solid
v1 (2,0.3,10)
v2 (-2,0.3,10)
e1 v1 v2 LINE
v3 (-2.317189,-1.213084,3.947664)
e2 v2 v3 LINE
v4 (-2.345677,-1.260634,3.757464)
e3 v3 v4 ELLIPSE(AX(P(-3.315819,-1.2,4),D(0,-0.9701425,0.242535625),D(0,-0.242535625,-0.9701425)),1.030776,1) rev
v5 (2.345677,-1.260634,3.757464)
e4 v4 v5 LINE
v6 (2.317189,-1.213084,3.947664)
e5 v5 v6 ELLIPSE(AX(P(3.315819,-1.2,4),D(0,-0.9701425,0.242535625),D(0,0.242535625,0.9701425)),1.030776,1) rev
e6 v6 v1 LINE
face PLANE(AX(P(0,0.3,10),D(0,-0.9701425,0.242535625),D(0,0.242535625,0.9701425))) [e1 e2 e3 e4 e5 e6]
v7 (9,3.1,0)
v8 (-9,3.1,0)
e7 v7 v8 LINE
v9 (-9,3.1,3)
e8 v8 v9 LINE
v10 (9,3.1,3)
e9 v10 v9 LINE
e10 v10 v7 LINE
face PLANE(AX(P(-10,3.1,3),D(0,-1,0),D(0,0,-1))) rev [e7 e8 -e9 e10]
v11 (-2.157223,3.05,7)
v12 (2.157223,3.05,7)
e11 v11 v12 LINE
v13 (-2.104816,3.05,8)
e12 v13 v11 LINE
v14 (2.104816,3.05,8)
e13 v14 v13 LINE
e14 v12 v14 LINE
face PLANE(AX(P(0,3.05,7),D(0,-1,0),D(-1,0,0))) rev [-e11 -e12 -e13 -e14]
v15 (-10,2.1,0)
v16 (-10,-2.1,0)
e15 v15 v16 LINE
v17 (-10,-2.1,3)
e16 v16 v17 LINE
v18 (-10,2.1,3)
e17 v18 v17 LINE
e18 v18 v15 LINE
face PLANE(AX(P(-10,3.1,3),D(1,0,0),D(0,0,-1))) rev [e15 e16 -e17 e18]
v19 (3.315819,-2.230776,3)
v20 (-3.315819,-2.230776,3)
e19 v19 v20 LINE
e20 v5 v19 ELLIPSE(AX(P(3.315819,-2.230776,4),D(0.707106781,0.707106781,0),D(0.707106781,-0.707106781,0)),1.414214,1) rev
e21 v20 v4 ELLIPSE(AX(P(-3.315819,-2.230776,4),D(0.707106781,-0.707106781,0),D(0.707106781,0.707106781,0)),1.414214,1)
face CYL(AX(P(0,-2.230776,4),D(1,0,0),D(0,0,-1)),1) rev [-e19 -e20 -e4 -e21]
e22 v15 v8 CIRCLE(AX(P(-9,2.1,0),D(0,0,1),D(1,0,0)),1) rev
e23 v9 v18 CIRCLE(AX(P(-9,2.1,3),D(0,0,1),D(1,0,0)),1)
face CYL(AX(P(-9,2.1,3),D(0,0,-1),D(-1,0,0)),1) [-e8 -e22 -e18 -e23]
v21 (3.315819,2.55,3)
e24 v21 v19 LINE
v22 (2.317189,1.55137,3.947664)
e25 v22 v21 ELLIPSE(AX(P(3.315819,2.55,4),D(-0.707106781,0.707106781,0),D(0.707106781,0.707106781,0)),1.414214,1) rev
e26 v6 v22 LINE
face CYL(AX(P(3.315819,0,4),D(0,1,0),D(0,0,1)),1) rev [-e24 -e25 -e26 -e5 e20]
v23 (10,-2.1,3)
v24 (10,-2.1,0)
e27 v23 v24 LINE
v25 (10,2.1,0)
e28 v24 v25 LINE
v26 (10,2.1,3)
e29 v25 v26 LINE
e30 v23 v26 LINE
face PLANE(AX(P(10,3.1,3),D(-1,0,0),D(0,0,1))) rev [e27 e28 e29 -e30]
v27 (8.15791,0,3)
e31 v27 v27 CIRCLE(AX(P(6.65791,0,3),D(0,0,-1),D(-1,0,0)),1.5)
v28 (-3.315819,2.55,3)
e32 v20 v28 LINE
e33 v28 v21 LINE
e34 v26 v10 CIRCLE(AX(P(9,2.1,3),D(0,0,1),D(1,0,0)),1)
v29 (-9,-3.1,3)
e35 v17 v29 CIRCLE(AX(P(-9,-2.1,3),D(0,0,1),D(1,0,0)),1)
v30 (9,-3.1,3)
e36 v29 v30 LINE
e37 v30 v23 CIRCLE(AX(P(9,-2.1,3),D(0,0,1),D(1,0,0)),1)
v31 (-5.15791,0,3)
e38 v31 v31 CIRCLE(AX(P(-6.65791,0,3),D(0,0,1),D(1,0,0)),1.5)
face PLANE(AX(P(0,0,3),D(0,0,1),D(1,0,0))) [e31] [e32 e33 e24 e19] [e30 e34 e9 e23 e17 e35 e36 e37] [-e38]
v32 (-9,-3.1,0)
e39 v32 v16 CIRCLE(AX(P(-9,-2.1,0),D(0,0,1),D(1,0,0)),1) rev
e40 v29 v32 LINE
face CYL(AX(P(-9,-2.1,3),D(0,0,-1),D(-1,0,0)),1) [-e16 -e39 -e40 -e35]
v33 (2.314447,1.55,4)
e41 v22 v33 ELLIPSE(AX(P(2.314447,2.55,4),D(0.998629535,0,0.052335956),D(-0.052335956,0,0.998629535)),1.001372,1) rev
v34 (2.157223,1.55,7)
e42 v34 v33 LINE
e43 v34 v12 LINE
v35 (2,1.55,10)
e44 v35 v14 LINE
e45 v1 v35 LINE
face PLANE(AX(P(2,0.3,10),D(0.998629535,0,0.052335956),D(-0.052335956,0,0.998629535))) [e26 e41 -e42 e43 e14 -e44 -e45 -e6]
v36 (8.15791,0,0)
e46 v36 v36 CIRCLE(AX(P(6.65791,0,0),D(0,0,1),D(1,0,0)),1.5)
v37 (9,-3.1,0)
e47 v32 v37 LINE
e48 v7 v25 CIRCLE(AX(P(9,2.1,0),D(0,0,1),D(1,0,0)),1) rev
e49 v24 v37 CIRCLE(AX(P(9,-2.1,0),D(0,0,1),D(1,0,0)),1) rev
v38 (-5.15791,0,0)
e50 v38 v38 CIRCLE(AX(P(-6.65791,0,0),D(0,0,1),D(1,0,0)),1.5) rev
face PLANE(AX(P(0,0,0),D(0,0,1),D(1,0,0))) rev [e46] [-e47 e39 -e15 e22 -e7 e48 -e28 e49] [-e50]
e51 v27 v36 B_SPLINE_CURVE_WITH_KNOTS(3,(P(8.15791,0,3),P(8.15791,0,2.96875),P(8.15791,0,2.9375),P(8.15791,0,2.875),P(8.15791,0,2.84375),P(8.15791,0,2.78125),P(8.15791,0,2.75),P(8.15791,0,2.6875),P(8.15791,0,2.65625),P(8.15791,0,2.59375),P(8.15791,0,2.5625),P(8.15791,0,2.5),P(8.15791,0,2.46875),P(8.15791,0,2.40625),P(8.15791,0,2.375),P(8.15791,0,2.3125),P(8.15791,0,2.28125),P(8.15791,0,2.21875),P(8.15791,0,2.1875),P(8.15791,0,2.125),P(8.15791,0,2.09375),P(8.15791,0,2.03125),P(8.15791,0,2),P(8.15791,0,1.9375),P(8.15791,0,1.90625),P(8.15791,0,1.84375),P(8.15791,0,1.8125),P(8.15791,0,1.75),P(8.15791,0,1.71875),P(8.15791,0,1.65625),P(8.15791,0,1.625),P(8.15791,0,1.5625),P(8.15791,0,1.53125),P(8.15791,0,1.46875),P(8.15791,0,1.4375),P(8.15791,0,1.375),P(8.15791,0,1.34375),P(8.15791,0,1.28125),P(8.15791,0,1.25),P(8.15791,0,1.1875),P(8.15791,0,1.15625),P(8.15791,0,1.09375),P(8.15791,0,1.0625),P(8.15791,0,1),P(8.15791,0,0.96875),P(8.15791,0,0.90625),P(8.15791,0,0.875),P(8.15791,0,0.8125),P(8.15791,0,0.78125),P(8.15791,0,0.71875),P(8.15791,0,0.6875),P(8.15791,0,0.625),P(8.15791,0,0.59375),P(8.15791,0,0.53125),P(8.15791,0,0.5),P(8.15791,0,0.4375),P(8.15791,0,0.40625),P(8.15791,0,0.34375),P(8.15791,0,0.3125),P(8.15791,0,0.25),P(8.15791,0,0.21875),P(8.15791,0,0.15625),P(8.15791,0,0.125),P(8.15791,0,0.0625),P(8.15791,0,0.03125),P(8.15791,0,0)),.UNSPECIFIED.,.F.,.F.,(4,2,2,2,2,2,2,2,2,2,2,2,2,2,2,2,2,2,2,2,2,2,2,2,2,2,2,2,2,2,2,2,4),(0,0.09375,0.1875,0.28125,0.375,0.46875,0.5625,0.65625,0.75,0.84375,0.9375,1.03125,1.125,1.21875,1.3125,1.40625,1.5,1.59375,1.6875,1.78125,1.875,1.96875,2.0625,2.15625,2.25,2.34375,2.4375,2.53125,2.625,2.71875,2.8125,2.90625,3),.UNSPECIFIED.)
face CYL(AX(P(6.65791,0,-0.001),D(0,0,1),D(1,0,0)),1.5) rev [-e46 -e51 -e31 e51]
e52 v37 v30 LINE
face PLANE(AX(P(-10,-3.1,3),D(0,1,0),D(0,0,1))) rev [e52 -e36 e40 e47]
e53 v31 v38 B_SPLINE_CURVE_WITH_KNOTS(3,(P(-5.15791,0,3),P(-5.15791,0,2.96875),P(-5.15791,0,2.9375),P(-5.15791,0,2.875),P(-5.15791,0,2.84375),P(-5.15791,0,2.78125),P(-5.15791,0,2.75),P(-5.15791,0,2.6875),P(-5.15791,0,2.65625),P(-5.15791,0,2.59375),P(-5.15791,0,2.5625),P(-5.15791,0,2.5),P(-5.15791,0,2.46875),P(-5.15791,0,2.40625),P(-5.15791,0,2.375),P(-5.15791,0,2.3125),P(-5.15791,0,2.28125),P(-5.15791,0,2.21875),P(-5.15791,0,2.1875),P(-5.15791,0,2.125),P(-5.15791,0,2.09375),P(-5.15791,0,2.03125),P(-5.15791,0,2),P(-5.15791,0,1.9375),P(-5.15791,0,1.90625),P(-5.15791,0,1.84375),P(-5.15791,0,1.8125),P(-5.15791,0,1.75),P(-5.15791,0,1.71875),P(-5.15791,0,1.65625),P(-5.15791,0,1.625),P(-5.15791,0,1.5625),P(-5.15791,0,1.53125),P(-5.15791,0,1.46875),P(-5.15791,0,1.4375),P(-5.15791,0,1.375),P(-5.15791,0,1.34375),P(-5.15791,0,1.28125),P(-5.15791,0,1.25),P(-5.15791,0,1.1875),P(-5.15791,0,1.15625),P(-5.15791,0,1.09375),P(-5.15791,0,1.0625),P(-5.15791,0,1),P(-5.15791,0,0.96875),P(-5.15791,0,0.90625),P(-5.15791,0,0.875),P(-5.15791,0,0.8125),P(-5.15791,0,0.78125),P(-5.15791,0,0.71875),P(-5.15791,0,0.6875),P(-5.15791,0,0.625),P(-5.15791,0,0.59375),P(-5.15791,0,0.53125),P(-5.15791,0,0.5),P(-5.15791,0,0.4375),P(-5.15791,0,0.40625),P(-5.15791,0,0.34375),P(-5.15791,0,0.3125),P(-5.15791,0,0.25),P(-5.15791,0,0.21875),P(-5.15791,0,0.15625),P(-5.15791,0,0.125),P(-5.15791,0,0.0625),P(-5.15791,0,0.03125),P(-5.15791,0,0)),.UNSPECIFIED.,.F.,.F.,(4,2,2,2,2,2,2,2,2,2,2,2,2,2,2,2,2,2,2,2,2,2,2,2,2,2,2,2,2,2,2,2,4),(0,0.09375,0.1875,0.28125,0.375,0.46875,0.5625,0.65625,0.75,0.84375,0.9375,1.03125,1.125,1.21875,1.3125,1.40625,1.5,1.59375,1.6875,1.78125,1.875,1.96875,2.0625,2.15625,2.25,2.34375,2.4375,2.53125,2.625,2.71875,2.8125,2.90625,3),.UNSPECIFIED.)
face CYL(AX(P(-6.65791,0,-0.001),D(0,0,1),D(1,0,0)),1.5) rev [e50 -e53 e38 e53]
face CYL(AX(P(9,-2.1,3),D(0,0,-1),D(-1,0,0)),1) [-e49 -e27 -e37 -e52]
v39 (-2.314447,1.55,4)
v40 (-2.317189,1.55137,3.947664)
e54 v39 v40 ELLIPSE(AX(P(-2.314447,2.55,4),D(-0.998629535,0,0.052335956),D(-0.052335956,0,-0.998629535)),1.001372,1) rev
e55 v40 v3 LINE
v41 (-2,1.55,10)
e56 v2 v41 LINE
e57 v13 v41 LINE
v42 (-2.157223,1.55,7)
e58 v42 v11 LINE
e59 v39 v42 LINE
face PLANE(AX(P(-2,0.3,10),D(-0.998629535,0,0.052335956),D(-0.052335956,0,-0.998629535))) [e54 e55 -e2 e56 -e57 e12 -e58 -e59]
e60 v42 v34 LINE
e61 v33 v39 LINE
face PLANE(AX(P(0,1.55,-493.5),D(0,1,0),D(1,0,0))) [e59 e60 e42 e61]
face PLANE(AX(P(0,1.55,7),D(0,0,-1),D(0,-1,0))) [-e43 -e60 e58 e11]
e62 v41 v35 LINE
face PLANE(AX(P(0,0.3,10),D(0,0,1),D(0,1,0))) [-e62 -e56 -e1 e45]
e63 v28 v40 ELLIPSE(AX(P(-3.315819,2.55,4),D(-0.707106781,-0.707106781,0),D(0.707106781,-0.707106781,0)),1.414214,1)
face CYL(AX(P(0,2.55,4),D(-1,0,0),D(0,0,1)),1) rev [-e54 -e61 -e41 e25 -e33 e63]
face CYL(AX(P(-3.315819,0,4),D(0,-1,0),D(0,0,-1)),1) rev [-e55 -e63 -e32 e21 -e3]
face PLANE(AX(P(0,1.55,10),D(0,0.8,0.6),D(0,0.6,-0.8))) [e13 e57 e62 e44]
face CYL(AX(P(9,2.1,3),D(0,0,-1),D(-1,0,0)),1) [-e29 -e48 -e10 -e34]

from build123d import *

# Parameters (mm, degrees)
SKETCH1_W           = 20
SKETCH1_H           = 6.2
BOSS_EXTRUDE1_DEPTH = 3
SNAP_START          = 0.3
SNAP_HOOK1_DEPTH    = 1.25
SNAP_START_2        = -2.157223338
SNAP_HOOK1_2_DEPTH  = 4.314446676
SNAP_START_3        = -2.366854455
SNAP_HOOK1_3_DEPTH  = 4.73370891
SNAP_START_4        = -2
SNAP_HOOK1_4_DEPTH  = 6
FILLET1_R           = 1
CUT_EXTRUDE1_REACH  = 14.594
SKETCH3_R           = 1.5
FILLET2_R           = 1


with BuildPart() as part:
    # Sketch1 → Boss-Extrude1 (new body)
    with BuildSketch(Plane.XY):
        Rectangle(SKETCH1_W, SKETCH1_H)
    extrude(amount=BOSS_EXTRUDE1_DEPTH)

    # Snap Hook1: read off the stored shape, not the designer's step
    # Snap Hook1 outline → Snap Hook1 (add)
    with BuildSketch(Plane(origin=(0, 0, 0), x_dir=(1, 0, 0), z_dir=(0, 1, 0)).offset(SNAP_START)):
        Polygon((2.366854455, -3), (-2.366854455, -3), (-2, -10), (2, -10), align=None)
    extrude(amount=SNAP_HOOK1_DEPTH)

    # Snap Hook1 2 outline → Snap Hook1 2 (add)
    with BuildSketch(Plane.YZ.offset(SNAP_START_2)):
        Polygon((0.3, 3), (0.3, 10), (-1.45, 3), align=None)
        Polygon((1.55, 10), (1.55, 7), (3.05, 7), (3.05, 8), align=None)
    extrude(amount=SNAP_HOOK1_2_DEPTH)

    # Snap Hook1 3 outline → Snap Hook1 3 (add)
    with BuildSketch(Plane.YZ.offset(SNAP_START_3)):
        Polygon((0.3, 3), (0.3, 10), (-1.45, 3), align=None)
    extrude(amount=SNAP_HOOK1_3_DEPTH)

    # Snap Hook1 4 outline → Snap Hook1 4 (cut)
    with BuildSketch(Plane(origin=(0, 0, 0), x_dir=(1, 0, 0), z_dir=(0, 1, 0)).offset(SNAP_START_4)):
        Polygon((-2.366854455, -3), (-2.366854455, -11), (-1.947592221, -11), (-2, -10), align=None)
        Polygon((2, -10), (1.947592221, -11), (2.366854455, -11), (2.366854455, -3), align=None)
    extrude(amount=SNAP_HOOK1_4_DEPTH, mode=Mode.SUBTRACT)

    # Fillet1
    # the kernel refuses this fillet: 1 mm, written as the material it adds along each edge
    with BuildSketch(Plane(origin=(4.866854455, 1.55, 3), x_dir=(0, 1, 0), z_dir=(-1, 0, 0))) as fillet1_piece_1_section:
        with BuildLine():
            CenterArc((FILLET1_R, -FILLET1_R), FILLET1_R, 90, 90)
            Line((0, -FILLET1_R), (0, 0))
            Line((0, 0), (FILLET1_R, 0))
        make_face()
    fillet1_piece_1 = extrude(amount=9.73370891, mode=Mode.PRIVATE)
    fillet1_piece_1 = split(fillet1_piece_1, bisect_by=Plane(origin=(-2.347040948, 1.55, 3.378064238), z_dir=(0.9986295347544344, 0, -0.05233595624560593)), keep=Keep.TOP, mode=Mode.PRIVATE)
    fillet1_piece_1 = split(fillet1_piece_1, bisect_by=Plane(origin=(2.373702086, 1.55, 2.869339421), z_dir=(-0.9986295347544344, 0, -0.05233595624560593)), keep=Keep.TOP, mode=Mode.PRIVATE)
    add(fillet1_piece_1)
    with BuildSketch(Plane(origin=(2.366854455, 1.55, 3), x_dir=(1, 0, 0), z_dir=(0, -1, 0))) as fillet1_piece_2_section:
        with BuildLine():
            CenterArc((FILLET1_R * 0.948964566712, FILLET1_R), FILLET1_R, 183, 87)
            Line((-FILLET1_R * 0.0496649680421, FILLET1_R * 0.947664043754), (0, 0))
            Line((0, 0), (FILLET1_R * 0.948964566712, 0))
        make_face()
    fillet1_piece_2 = extrude(amount=5.372411417, mode=Mode.PRIVATE)
    fillet1_piece_2 = split(fillet1_piece_2, bisect_by=Plane(origin=(2.366854455, -1.273529412, 3.705882353), z_dir=(0, 0.9701425001453319, -0.24253562503633297)), keep=Keep.TOP, mode=Mode.PRIVATE)
    add(fillet1_piece_2)
    with BuildSketch(Plane(origin=(4.318795471, -1.45, 3), x_dir=(0, -1, 0), z_dir=(-1, 0, 0))) as fillet1_piece_3_section:
        with BuildLine():
            CenterArc((FILLET1_R * 0.780776406404, FILLET1_R), FILLET1_R, 194.036243468, 75.963756532)
            Line((-FILLET1_R * 0.189366093741, FILLET1_R * 0.757464374964), (0, 0))
            Line((0, 0), (FILLET1_R * 0.780776406404, 0))
        make_face()
    fillet1_piece_3 = extrude(amount=8.637590942, mode=Mode.PRIVATE)
    fillet1_piece_3 = split(fillet1_piece_3, bisect_by=Plane(origin=(2.372200924, -1.45, 2.897983303), z_dir=(-0.9986295347544344, 0, -0.05233595624560593)), keep=Keep.TOP, mode=Mode.PRIVATE)
    fillet1_piece_3 = split(fillet1_piece_3, bisect_by=Plane(origin=(-2.34854211, -1.45, 3.349420356), z_dir=(0.9986295347544344, 0, -0.05233595624560593)), keep=Keep.TOP, mode=Mode.PRIVATE)
    add(fillet1_piece_3)
    with BuildSketch(Plane(origin=(-2.366854455, -3.822411417, 3), x_dir=(-1, 0, 0), z_dir=(0, 1, 0))) as fillet1_piece_4_section:
        with BuildLine():
            CenterArc((FILLET1_R * 0.948964566712, FILLET1_R), FILLET1_R, 183, 87)
            Line((-FILLET1_R * 0.0496649680421, FILLET1_R * 0.947664043754), (0, 0))
            Line((0, 0), (FILLET1_R * 0.948964566712, 0))
        make_face()
    fillet1_piece_4 = extrude(amount=5.372411417, mode=Mode.PRIVATE)
    fillet1_piece_4 = split(fillet1_piece_4, bisect_by=Plane(origin=(-2.366854455, -1.589553613, 2.441785549), z_dir=(0, 0.9701425001453319, -0.24253562503633297)), keep=Keep.TOP, mode=Mode.PRIVATE)
    add(fillet1_piece_4)
    with BuildSketch(Plane(origin=(2.366854455, 3.922411417, 3), x_dir=(1, 0, 0), z_dir=(0, -1, 0))) as fillet1_piece_5a_section:
        with BuildLine():
            CenterArc((FILLET1_R * 0.948964566712, FILLET1_R), FILLET1_R, 183, 87)
            Line((-FILLET1_R * 0.0496649680421, FILLET1_R * 0.947664043754), (0, 0))
            Line((0, 0), (FILLET1_R * 0.948964566712, 0))
        make_face()
    fillet1_piece_5a = extrude(amount=7.744822834, mode=Mode.PRIVATE)
    fillet1_piece_5a = split(fillet1_piece_5a, bisect_by=Plane(origin=(2.366854455, 3.1, 3), z_dir=(0, -1, 0)), keep=Keep.TOP, mode=Mode.PRIVATE)
    fillet1_piece_5a = split(fillet1_piece_5a, bisect_by=Plane(origin=(2.366854455, 1.55, 3), z_dir=(0, 1, 0)), keep=Keep.TOP, mode=Mode.PRIVATE)
    with BuildSketch(Plane(origin=(4.866854455, 1.55, 3), x_dir=(0, 1, 0), z_dir=(-1, 0, 0))) as fillet1_piece_5b_section:
        with BuildLine():
            CenterArc((FILLET1_R, -FILLET1_R), FILLET1_R, 90, 90)
            Line((0, -FILLET1_R), (0, 0))
            Line((0, 0), (FILLET1_R, 0))
        make_face()
    fillet1_piece_5b = extrude(amount=9.73370891, mode=Mode.PRIVATE)
    fillet1_piece_5b = split(fillet1_piece_5b, bisect_by=Plane(origin=(2.373702086, 1.55, 2.869339421), z_dir=(0.9986295347544344, 0, 0.05233595624560593)), keep=Keep.TOP, mode=Mode.PRIVATE)
    fillet1_piece_5 = fillet1_piece_5a & fillet1_piece_5b
    add(fillet1_piece_5)
    with BuildSketch(Plane(origin=(4.866854455, 1.55, 3), x_dir=(0, 1, 0), z_dir=(-1, 0, 0))) as fillet1_piece_6a_section:
        with BuildLine():
            CenterArc((FILLET1_R, -FILLET1_R), FILLET1_R, 90, 90)
            Line((0, -FILLET1_R), (0, 0))
            Line((0, 0), (FILLET1_R, 0))
        make_face()
    fillet1_piece_6a = extrude(amount=9.73370891, mode=Mode.PRIVATE)
    fillet1_piece_6a = split(fillet1_piece_6a, bisect_by=Plane(origin=(-2.347040948, 1.55, 3.378064238), z_dir=(-0.9986295347544344, 0, 0.05233595624560593)), keep=Keep.TOP, mode=Mode.PRIVATE)
    with BuildSketch(Plane(origin=(-2.366854455, -3.822411417, 3), x_dir=(-1, 0, 0), z_dir=(0, 1, 0))) as fillet1_piece_6b_section:
        with BuildLine():
            CenterArc((FILLET1_R * 0.948964566712, FILLET1_R), FILLET1_R, 183, 87)
            Line((-FILLET1_R * 0.0496649680421, FILLET1_R * 0.947664043754), (0, 0))
            Line((0, 0), (FILLET1_R * 0.948964566712, 0))
        make_face()
    fillet1_piece_6b = extrude(amount=7.744822834, mode=Mode.PRIVATE)
    fillet1_piece_6b = split(fillet1_piece_6b, bisect_by=Plane(origin=(-2.366854455, 3.1, 3), z_dir=(0, -1, 0)), keep=Keep.TOP, mode=Mode.PRIVATE)
    fillet1_piece_6b = split(fillet1_piece_6b, bisect_by=Plane(origin=(-2.366854455, 1.55, 3), z_dir=(0, 1, 0)), keep=Keep.TOP, mode=Mode.PRIVATE)
    fillet1_piece_6 = fillet1_piece_6a & fillet1_piece_6b
    add(fillet1_piece_6)
    with BuildSketch(Plane(origin=(2.366854455, 1.55, 3), x_dir=(1, 0, 0), z_dir=(0, -1, 0))) as fillet1_piece_7a_section:
        with BuildLine():
            CenterArc((FILLET1_R * 0.948964566712, FILLET1_R), FILLET1_R, 183, 87)
            Line((-FILLET1_R * 0.0496649680421, FILLET1_R * 0.947664043754), (0, 0))
            Line((0, 0), (FILLET1_R * 0.948964566712, 0))
        make_face()
    fillet1_piece_7a = extrude(amount=5.372411417, mode=Mode.PRIVATE)
    fillet1_piece_7a = split(fillet1_piece_7a, bisect_by=Plane(origin=(2.366854455, -3.1, 3), z_dir=(0, 1, 0)), keep=Keep.TOP, mode=Mode.PRIVATE)
    fillet1_piece_7a = split(fillet1_piece_7a, bisect_by=Plane(origin=(2.366854455, -1.273529412, 3.705882353), z_dir=(0, -0.9701425001453319, 0.24253562503633297)), keep=Keep.TOP, mode=Mode.PRIVATE)
    with BuildSketch(Plane(origin=(4.318795471, -1.45, 3), x_dir=(0, -1, 0), z_dir=(-1, 0, 0))) as fillet1_piece_7b_section:
        with BuildLine():
            CenterArc((FILLET1_R * 0.780776406404, FILLET1_R), FILLET1_R, 194.036243468, 75.963756532)
            Line((-FILLET1_R * 0.189366093741, FILLET1_R * 0.757464374964), (0, 0))
            Line((0, 0), (FILLET1_R * 0.780776406404, 0))
        make_face()
    fillet1_piece_7b = extrude(amount=8.637590942, mode=Mode.PRIVATE)
    fillet1_piece_7b = split(fillet1_piece_7b, bisect_by=Plane(origin=(2.372200924, -1.45, 2.897983303), z_dir=(0.9986295347544344, 0, 0.05233595624560593)), keep=Keep.TOP, mode=Mode.PRIVATE)
    fillet1_piece_7 = fillet1_piece_7a & fillet1_piece_7b
    add(fillet1_piece_7)
    with BuildSketch(Plane(origin=(-2.366854455, -3.822411417, 3), x_dir=(-1, 0, 0), z_dir=(0, 1, 0))) as fillet1_piece_8a_section:
        with BuildLine():
            CenterArc((FILLET1_R * 0.948964566712, FILLET1_R), FILLET1_R, 183, 87)
            Line((-FILLET1_R * 0.0496649680421, FILLET1_R * 0.947664043754), (0, 0))
            Line((0, 0), (FILLET1_R * 0.948964566712, 0))
        make_face()
    fillet1_piece_8a = extrude(amount=5.372411417, mode=Mode.PRIVATE)
    fillet1_piece_8a = split(fillet1_piece_8a, bisect_by=Plane(origin=(-2.366854455, -3.1, 3), z_dir=(0, 1, 0)), keep=Keep.TOP, mode=Mode.PRIVATE)
    fillet1_piece_8a = split(fillet1_piece_8a, bisect_by=Plane(origin=(-2.366854455, -1.589553613, 2.441785549), z_dir=(0, -0.9701425001453319, 0.24253562503633297)), keep=Keep.TOP, mode=Mode.PRIVATE)
    with BuildSketch(Plane(origin=(4.318795471, -1.45, 3), x_dir=(0, -1, 0), z_dir=(-1, 0, 0))) as fillet1_piece_8b_section:
        with BuildLine():
            CenterArc((FILLET1_R * 0.780776406404, FILLET1_R), FILLET1_R, 194.036243468, 75.963756532)
            Line((-FILLET1_R * 0.189366093741, FILLET1_R * 0.757464374964), (0, 0))
            Line((0, 0), (FILLET1_R * 0.780776406404, 0))
        make_face()
    fillet1_piece_8b = extrude(amount=8.637590942, mode=Mode.PRIVATE)
    fillet1_piece_8b = split(fillet1_piece_8b, bisect_by=Plane(origin=(-2.34854211, -1.45, 3.349420356), z_dir=(-0.9986295347544344, 0, 0.05233595624560593)), keep=Keep.TOP, mode=Mode.PRIVATE)
    fillet1_piece_8 = fillet1_piece_8a & fillet1_piece_8b
    add(fillet1_piece_8)

    # Sketch3 → Cut-Extrude1 (cut, up to next)
    with BuildSketch(Plane.XY.offset(3), mode=Mode.PRIVATE) as cut_extrude1_sk1:
        with Locations((-6.657909511, 0)):
            Circle(SKETCH3_R)
    cut_extrude1_tool1 = extrude(cut_extrude1_sk1.sketch, amount=-CUT_EXTRUDE1_REACH, mode=Mode.PRIVATE) & part.part
    cut_extrude1 = cut_extrude1_tool1.solids().sort_by_distance((-6.65791, 0, 3))[0]
    add(cut_extrude1, mode=Mode.SUBTRACT)

    # Mirror1: Cut-Extrude1 across plane
    add(cut_extrude1.mirror(Plane(origin=(0, 0, 0), x_dir=(0, 0, 1), z_dir=(1, 0, 0))), mode=Mode.SUBTRACT)

    # Fillet2
    fillet2_edges = [part.edges().sort_by_distance(p)[0] for p in [
        (10, -3.1, 1.5),
        (-10, -3.1, 1.5),
        (-10, 3.1, 1.5),
        (10, 3.1, 1.5),
    ]]
    fillet(fillet2_edges, radius=FILLET2_R)


solid = part.part
